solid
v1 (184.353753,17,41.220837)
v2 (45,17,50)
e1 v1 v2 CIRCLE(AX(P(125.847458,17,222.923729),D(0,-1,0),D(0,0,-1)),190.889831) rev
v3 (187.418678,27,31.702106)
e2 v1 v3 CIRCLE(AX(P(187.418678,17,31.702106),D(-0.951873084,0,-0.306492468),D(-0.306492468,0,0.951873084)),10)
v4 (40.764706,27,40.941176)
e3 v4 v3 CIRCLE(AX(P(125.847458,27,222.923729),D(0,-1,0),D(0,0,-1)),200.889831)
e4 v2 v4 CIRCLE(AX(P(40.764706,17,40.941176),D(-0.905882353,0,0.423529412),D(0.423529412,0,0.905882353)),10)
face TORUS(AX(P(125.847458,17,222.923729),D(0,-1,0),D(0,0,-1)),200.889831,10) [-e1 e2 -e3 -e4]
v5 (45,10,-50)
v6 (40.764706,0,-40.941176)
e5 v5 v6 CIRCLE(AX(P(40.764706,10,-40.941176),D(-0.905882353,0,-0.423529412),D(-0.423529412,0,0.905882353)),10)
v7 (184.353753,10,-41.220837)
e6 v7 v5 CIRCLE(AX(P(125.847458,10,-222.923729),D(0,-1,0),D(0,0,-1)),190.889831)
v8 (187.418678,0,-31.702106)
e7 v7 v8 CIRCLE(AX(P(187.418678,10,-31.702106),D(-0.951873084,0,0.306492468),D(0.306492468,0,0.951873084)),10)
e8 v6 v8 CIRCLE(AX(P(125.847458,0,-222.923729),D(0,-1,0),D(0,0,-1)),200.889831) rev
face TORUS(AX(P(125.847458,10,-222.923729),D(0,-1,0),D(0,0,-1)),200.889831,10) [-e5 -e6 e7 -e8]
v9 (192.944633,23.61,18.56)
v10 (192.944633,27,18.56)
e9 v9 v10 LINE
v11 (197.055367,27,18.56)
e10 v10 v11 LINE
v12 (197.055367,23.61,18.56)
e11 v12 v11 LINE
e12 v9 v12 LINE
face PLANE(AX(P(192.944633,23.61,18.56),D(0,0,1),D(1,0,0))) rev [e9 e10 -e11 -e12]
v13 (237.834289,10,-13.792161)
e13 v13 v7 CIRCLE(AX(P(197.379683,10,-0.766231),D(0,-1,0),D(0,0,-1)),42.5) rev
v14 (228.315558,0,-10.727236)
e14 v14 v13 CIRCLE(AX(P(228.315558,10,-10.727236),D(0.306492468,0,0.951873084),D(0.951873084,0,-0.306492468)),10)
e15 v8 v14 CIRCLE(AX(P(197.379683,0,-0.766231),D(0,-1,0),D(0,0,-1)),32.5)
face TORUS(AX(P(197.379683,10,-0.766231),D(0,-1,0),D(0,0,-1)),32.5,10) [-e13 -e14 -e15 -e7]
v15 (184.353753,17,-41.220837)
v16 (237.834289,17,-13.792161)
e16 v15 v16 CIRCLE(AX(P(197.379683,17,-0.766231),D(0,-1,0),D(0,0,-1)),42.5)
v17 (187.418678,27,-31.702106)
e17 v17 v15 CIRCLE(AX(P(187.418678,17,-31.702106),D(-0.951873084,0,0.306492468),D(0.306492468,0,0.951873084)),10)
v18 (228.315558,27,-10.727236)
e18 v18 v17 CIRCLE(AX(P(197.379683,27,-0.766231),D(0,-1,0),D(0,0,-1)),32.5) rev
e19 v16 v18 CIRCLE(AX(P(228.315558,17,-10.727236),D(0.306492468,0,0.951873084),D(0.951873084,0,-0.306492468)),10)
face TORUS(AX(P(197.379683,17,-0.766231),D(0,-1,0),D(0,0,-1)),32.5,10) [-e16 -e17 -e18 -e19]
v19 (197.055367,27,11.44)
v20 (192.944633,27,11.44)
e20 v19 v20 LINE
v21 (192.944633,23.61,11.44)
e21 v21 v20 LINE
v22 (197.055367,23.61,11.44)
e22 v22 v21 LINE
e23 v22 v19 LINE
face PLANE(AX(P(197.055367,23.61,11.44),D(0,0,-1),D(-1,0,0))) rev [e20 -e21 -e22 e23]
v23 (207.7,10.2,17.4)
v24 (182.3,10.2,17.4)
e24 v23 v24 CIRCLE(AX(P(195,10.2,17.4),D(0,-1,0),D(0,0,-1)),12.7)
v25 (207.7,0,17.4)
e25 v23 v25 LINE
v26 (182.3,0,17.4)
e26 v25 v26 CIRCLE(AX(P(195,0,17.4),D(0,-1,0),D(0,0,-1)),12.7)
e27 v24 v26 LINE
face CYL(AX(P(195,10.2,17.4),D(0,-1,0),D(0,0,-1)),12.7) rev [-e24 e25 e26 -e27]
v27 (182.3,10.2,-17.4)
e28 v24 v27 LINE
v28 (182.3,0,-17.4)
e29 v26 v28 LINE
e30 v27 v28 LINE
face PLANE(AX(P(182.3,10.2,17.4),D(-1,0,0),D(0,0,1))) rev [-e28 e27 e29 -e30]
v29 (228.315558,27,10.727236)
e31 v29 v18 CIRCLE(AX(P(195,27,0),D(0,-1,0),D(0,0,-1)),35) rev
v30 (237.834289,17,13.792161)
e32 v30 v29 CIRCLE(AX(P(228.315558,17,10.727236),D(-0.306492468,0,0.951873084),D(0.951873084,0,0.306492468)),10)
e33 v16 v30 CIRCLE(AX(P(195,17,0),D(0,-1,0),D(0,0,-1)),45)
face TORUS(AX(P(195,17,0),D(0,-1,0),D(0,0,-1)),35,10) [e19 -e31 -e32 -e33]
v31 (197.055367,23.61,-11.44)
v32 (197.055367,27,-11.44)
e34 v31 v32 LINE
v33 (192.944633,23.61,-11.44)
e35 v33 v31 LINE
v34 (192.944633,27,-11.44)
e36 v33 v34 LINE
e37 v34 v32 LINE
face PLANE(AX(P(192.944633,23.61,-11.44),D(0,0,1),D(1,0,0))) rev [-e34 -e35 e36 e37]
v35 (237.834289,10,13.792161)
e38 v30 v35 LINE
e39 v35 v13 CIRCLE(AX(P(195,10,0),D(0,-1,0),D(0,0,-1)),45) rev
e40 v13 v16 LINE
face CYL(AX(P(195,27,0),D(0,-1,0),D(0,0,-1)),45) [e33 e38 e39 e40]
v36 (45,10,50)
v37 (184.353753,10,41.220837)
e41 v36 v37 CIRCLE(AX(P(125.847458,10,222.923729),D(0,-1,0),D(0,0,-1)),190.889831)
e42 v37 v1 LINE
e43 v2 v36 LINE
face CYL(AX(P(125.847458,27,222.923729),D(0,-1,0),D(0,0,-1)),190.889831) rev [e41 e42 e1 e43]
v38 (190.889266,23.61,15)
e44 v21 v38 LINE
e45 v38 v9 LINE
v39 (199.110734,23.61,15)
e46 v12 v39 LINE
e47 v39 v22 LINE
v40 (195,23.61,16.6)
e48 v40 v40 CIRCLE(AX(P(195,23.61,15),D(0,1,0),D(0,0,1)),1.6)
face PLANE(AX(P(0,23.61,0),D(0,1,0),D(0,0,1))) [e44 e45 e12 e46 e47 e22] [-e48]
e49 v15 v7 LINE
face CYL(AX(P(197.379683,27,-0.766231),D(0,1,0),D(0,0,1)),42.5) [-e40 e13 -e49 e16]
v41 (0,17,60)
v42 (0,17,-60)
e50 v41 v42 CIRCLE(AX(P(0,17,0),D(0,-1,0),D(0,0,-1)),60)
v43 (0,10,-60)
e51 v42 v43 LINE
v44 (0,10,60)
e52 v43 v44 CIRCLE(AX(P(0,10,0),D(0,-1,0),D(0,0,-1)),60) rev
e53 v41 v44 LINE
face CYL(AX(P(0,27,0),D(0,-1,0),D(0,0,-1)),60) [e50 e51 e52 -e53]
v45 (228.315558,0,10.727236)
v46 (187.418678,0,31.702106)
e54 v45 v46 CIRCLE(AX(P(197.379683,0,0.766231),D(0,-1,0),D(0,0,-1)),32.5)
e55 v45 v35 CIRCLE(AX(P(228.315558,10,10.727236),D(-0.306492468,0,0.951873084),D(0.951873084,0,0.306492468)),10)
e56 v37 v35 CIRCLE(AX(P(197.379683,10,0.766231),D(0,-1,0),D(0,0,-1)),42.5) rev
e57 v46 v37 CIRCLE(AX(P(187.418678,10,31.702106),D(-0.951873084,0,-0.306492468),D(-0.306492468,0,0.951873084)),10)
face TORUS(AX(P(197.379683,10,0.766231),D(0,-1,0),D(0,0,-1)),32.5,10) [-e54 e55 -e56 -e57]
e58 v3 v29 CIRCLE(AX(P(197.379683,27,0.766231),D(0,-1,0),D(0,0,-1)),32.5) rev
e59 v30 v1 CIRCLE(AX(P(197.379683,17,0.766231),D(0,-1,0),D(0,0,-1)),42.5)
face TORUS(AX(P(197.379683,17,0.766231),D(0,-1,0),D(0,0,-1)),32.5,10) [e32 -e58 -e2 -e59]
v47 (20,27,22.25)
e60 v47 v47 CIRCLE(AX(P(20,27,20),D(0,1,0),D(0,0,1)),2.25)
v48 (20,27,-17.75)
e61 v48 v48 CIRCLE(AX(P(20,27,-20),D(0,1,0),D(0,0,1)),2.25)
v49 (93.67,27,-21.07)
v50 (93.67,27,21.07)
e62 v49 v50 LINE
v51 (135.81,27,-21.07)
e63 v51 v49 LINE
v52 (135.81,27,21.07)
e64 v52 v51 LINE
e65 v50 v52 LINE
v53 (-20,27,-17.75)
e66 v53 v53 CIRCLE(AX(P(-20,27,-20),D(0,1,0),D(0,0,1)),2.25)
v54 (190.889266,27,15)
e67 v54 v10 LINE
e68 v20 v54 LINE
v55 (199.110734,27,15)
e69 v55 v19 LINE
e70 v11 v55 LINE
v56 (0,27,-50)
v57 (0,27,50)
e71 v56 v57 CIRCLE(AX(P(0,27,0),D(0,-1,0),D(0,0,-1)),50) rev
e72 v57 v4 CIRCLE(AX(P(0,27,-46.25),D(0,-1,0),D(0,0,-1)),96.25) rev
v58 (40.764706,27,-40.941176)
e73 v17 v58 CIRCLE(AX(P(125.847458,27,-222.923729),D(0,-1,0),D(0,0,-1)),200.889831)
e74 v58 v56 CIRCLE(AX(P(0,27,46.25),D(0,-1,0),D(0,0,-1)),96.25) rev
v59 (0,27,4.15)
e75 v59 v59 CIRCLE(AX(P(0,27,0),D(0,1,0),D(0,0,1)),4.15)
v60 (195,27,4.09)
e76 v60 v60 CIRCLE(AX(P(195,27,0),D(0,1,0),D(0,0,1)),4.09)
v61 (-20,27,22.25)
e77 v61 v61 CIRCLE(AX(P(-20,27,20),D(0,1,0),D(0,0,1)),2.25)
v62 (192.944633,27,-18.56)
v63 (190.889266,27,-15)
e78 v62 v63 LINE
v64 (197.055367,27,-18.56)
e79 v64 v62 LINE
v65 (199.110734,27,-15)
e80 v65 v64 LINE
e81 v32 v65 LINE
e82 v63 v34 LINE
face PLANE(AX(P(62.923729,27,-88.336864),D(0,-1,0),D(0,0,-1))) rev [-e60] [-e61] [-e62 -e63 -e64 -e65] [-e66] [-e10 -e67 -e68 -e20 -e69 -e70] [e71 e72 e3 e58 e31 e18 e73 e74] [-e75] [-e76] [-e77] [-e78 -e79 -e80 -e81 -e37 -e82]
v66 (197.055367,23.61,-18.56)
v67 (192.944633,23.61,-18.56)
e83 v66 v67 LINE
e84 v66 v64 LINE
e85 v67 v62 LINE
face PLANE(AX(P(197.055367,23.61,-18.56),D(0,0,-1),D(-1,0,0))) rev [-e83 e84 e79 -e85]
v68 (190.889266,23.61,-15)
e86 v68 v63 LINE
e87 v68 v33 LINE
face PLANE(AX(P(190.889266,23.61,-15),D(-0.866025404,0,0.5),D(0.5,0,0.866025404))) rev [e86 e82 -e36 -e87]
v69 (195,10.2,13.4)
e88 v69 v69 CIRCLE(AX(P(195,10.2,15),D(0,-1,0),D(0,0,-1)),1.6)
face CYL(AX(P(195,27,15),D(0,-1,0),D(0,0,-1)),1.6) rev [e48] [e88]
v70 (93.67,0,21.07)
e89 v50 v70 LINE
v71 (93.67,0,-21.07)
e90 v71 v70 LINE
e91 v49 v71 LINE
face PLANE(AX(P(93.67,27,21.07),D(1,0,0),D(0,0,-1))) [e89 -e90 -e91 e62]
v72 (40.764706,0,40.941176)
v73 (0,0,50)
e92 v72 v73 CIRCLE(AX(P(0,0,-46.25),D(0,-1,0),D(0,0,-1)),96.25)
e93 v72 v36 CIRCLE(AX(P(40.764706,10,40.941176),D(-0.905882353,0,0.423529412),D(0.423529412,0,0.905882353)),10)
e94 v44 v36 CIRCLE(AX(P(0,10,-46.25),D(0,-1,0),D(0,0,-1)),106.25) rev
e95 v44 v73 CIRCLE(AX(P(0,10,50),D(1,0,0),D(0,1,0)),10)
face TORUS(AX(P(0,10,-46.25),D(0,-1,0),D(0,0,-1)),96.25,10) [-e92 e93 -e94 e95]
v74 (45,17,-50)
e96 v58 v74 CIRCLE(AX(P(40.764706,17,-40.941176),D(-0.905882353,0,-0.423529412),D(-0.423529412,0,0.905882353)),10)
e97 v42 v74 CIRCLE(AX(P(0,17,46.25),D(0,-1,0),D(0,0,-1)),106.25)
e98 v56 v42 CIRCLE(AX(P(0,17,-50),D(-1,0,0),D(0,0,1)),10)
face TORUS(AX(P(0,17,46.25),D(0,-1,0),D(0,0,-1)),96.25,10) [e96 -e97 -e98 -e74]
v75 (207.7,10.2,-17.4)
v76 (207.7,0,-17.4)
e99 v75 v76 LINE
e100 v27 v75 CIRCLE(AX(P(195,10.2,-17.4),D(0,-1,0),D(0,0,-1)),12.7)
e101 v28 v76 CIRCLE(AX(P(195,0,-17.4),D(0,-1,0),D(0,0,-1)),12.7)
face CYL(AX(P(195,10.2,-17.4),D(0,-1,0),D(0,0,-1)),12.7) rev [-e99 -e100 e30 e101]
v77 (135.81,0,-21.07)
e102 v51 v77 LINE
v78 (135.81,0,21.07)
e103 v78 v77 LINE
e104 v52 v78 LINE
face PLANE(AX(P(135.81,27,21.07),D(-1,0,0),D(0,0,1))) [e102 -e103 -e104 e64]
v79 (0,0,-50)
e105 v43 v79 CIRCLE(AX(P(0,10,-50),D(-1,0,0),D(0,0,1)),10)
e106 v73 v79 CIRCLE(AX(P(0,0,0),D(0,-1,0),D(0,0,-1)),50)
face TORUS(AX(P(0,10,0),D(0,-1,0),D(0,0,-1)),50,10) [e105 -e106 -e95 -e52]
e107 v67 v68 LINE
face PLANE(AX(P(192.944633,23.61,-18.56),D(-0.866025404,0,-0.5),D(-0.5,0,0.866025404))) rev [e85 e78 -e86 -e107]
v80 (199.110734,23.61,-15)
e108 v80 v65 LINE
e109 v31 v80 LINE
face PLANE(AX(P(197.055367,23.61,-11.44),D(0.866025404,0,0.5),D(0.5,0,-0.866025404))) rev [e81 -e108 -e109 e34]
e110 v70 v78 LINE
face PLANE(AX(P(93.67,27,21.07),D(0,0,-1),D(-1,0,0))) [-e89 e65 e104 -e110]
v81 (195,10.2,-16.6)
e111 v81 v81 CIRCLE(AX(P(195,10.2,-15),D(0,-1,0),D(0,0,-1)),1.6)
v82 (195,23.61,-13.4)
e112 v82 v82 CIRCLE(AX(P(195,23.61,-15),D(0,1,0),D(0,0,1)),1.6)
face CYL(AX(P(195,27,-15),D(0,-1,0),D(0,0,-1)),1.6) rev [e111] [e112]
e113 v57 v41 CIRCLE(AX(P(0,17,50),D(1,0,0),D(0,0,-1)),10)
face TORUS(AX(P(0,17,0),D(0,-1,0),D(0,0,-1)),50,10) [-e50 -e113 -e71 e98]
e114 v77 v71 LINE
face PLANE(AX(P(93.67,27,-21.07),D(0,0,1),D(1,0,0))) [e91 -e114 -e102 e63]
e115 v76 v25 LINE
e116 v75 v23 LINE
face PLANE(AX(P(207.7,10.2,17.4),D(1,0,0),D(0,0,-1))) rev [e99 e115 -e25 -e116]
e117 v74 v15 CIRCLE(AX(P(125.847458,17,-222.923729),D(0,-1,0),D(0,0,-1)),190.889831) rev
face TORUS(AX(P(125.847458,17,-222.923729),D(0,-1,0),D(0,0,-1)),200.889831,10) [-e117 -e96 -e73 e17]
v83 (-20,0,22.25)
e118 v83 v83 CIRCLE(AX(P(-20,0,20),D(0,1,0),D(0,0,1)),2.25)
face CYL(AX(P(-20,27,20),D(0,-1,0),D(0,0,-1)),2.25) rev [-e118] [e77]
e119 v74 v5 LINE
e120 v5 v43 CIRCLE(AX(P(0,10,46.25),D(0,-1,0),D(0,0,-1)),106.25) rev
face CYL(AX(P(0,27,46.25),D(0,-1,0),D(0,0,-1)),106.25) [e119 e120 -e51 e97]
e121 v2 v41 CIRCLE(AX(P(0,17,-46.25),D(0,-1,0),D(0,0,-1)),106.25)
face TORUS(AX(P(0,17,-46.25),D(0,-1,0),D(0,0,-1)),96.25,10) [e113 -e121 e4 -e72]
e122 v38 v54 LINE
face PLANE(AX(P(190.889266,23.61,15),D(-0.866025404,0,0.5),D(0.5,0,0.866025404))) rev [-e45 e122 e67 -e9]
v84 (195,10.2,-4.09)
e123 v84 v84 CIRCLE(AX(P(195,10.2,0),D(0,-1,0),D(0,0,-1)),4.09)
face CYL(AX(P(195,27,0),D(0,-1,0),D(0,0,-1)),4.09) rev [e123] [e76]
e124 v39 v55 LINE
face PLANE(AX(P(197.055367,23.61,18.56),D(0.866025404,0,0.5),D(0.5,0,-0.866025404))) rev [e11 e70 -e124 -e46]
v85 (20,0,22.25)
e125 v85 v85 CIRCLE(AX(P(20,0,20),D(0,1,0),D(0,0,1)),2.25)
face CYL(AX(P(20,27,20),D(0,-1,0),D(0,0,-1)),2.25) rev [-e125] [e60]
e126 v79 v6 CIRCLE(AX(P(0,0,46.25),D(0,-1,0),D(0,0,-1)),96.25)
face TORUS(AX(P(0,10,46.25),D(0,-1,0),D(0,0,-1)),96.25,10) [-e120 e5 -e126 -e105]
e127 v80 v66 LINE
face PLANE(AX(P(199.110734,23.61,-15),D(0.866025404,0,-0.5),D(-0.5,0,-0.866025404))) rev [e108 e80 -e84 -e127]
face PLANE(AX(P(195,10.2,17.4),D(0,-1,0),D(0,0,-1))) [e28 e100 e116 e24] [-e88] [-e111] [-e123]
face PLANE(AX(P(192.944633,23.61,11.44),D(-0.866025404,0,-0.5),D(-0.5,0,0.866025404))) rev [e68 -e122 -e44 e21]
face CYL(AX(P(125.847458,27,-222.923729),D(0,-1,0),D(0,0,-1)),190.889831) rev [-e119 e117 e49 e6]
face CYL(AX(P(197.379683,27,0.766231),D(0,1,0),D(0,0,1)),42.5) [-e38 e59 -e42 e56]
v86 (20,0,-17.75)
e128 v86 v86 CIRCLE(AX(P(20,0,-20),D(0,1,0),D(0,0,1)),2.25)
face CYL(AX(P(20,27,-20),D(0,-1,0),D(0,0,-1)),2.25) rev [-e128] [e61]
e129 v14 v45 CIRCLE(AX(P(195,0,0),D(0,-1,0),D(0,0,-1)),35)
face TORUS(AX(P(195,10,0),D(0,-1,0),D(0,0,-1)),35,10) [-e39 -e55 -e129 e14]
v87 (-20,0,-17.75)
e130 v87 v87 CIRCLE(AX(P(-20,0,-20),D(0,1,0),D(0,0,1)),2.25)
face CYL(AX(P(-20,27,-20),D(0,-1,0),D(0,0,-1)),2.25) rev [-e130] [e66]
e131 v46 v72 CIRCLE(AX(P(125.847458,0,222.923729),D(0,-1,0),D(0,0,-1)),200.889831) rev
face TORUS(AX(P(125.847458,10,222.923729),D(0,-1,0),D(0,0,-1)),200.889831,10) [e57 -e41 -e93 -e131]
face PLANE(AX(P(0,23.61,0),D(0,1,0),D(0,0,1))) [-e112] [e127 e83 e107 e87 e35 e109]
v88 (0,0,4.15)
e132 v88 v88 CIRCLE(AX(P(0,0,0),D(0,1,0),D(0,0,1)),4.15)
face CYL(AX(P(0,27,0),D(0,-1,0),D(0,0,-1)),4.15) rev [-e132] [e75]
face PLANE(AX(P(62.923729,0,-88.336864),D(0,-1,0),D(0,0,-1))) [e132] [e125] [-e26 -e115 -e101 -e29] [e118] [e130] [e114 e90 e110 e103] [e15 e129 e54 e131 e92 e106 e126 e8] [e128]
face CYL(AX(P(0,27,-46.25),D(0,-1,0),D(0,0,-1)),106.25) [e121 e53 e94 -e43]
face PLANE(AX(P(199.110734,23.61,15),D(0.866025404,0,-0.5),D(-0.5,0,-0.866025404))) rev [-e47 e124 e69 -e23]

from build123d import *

# Parameters (mm, degrees)
SKETCH1_R               = 2.25
SKETCH1_R_2             = 4.15
SKETCH1_R_3             = 4.09
SKETCH1_R_4             = 1.6
SKETCH1_W               = 42.14
SKETCH1_H               = 42.14
SALIENTE_EXTRUIR1_DEPTH = 27
REDONDEO1_R             = 42.5
REDONDEO2_R             = 10
CORTAR_EXTRUIR1_DEPTH   = 10.2
CORTAR_EXTRUIR2_DEPTH   = 3.39


with BuildPart() as part:
    # Sketch1 → Saliente-Extruir1 (new body)
    with BuildSketch(Plane(origin=(0, 0, 0), x_dir=(1, 0, 0), z_dir=(0, 1, 0))):
        with BuildLine():
            ThreePointArc((0, 60), (-60, 0), (0, -60))
            ThreePointArc((0, -60), (23.048861143, -57.469875145), (45, -50))
            ThreePointArc((45, -50), (119.487995331, -32.139859918), (195, -45))
            ThreePointArc((195, -45), (240, 0), (195, 45))
            ThreePointArc((195, 45), (119.487995331, 32.139859918), (45, 50))
            ThreePointArc((45, 50), (23.048861143, 57.469875145), (0, 60))
        make_face()
        with Locations(Location((-20, -20, 0), (0, 0, 270))):
            Circle(SKETCH1_R, mode=Mode.SUBTRACT)
        with Locations(Location((20, -20, 0), (0, 0, 270))):
            Circle(SKETCH1_R, mode=Mode.SUBTRACT)
        with Locations(Location((-20, 20, 0), (0, 0, 270))):
            Circle(SKETCH1_R, mode=Mode.SUBTRACT)
        with Locations(Location((20, 20, 0), (0, 0, 270))):
            Circle(SKETCH1_R, mode=Mode.SUBTRACT)
        with Locations(Location((0, 0, 0), (0, 0, 270))):
            Circle(SKETCH1_R_2, mode=Mode.SUBTRACT)
        with Locations(Location((195, 0, 0), (0, 0, 270))):
            Circle(SKETCH1_R_3, mode=Mode.SUBTRACT)
        with Locations(Location((195, -15, 0), (0, 0, 270))):
            Circle(SKETCH1_R_4, mode=Mode.SUBTRACT)
        with Locations(Location((195, 15, 0), (0, 0, 270))):
            Circle(SKETCH1_R_4, mode=Mode.SUBTRACT)
        with Locations((114.74, 0)):
            Rectangle(SKETCH1_W, SKETCH1_H, mode=Mode.SUBTRACT)
    extrude(amount=SALIENTE_EXTRUIR1_DEPTH)

    # Redondeo1
    # the kernel refuses this fillet: 42.5 mm, written as the material it takes off along each edge
    with BuildSketch(Plane(origin=(195, -132.493054203, -45), x_dir=(0.8082364962283539, 0, 0.5888580186806613), z_dir=(0, 1, 0))) as redondeo1_piece_1:
        with BuildLine():
            CenterArc((27.970755887, -34.35005109), REDONDEO1_R, 53.923988444, 90)
            ThreePointArc((-6.379295202, -9.323585296), (-3.120659761, -4.708994854), (0, 0))
            ThreePointArc((0, 0), (26.498610841, 8.62935767), (52.997221681, 0))
        make_face()
    extrude(amount=291.986108406, mode=Mode.SUBTRACT)
    with BuildSketch(Plane(origin=(195, -132.493054203, 45), x_dir=(-0.9423869480769151, 0, -0.3345247974280495), z_dir=(0, 1, 0))) as redondeo1_piece_2:
        with BuildLine():
            CenterArc((12.554710632, -42.481389287), REDONDEO1_R, 91.695666833, 90)
            ThreePointArc((-29.926678654, -43.73899188), (-22.085210872, -16.996636462), (0, 0))
            ThreePointArc((0, 0), (5.64855402, -0.083590492), (11.297108039, 0))
        make_face()
    extrude(amount=291.986108406, mode=Mode.SUBTRACT)

    # Redondeo2
    redondeo2_edges = [part.edges().sort_by_distance(p)[0] for p in [
        (23.048861143, 27, 57.469875145),
        (113.845361587, 27, 32.411584628),
        (23.048861143, 27, -57.469875145),
        (240, 0, 0),
        (240, 27, 0),
        (113.845361587, 0, -32.411584628),
        (216.774685632, 0, -38.582680786),
        (216.774685632, 0, 38.582680786),
        (113.845361587, 27, -32.411584628),
        (216.774685632, 27, -38.582680786),
        (216.774685632, 27, 38.582680786),
        (113.845361587, 0, 32.411584628),
        (23.048861143, 0, 57.469875145),
        (-60, 0, 0),
        (23.048861143, 0, -57.469875145),
        (-60, 27, 0),
    ]]
    fillet(redondeo2_edges, radius=REDONDEO2_R)

    # Croquis1 → Cortar-Extruir1 (cut)
    with BuildSketch(Plane.XZ):
        with BuildLine():
            Line((207.7, 17.4), (207.7, -17.4))
            ThreePointArc((207.7, -17.4), (195, -30.1), (182.3, -17.4))
            Line((182.3, -17.4), (182.3, 17.4))
            ThreePointArc((182.3, 17.4), (195, 30.1), (207.7, 17.4))
        make_face()
    extrude(amount=-CORTAR_EXTRUIR1_DEPTH, mode=Mode.SUBTRACT)

    # Croquis2 → Cortar-Extruir2 (cut)
    with BuildSketch(Plane(origin=(0, 27, 0), x_dir=(1, 0, 0), z_dir=(0, 1, 0))):
        Polygon((199.110733917, 15), (197.055366958, 18.56), (192.944633042, 18.56), (190.889266083, 15), (192.944633042, 11.44), (197.055366958, 11.44), align=None)
        Polygon((197.055366958, -11.44), (192.944633042, -11.44), (190.889266083, -15), (192.944633042, -18.56), (197.055366958, -18.56), (199.110733917, -15), align=None)
    extrude(amount=-CORTAR_EXTRUIR2_DEPTH, mode=Mode.SUBTRACT)


solid = part.part
